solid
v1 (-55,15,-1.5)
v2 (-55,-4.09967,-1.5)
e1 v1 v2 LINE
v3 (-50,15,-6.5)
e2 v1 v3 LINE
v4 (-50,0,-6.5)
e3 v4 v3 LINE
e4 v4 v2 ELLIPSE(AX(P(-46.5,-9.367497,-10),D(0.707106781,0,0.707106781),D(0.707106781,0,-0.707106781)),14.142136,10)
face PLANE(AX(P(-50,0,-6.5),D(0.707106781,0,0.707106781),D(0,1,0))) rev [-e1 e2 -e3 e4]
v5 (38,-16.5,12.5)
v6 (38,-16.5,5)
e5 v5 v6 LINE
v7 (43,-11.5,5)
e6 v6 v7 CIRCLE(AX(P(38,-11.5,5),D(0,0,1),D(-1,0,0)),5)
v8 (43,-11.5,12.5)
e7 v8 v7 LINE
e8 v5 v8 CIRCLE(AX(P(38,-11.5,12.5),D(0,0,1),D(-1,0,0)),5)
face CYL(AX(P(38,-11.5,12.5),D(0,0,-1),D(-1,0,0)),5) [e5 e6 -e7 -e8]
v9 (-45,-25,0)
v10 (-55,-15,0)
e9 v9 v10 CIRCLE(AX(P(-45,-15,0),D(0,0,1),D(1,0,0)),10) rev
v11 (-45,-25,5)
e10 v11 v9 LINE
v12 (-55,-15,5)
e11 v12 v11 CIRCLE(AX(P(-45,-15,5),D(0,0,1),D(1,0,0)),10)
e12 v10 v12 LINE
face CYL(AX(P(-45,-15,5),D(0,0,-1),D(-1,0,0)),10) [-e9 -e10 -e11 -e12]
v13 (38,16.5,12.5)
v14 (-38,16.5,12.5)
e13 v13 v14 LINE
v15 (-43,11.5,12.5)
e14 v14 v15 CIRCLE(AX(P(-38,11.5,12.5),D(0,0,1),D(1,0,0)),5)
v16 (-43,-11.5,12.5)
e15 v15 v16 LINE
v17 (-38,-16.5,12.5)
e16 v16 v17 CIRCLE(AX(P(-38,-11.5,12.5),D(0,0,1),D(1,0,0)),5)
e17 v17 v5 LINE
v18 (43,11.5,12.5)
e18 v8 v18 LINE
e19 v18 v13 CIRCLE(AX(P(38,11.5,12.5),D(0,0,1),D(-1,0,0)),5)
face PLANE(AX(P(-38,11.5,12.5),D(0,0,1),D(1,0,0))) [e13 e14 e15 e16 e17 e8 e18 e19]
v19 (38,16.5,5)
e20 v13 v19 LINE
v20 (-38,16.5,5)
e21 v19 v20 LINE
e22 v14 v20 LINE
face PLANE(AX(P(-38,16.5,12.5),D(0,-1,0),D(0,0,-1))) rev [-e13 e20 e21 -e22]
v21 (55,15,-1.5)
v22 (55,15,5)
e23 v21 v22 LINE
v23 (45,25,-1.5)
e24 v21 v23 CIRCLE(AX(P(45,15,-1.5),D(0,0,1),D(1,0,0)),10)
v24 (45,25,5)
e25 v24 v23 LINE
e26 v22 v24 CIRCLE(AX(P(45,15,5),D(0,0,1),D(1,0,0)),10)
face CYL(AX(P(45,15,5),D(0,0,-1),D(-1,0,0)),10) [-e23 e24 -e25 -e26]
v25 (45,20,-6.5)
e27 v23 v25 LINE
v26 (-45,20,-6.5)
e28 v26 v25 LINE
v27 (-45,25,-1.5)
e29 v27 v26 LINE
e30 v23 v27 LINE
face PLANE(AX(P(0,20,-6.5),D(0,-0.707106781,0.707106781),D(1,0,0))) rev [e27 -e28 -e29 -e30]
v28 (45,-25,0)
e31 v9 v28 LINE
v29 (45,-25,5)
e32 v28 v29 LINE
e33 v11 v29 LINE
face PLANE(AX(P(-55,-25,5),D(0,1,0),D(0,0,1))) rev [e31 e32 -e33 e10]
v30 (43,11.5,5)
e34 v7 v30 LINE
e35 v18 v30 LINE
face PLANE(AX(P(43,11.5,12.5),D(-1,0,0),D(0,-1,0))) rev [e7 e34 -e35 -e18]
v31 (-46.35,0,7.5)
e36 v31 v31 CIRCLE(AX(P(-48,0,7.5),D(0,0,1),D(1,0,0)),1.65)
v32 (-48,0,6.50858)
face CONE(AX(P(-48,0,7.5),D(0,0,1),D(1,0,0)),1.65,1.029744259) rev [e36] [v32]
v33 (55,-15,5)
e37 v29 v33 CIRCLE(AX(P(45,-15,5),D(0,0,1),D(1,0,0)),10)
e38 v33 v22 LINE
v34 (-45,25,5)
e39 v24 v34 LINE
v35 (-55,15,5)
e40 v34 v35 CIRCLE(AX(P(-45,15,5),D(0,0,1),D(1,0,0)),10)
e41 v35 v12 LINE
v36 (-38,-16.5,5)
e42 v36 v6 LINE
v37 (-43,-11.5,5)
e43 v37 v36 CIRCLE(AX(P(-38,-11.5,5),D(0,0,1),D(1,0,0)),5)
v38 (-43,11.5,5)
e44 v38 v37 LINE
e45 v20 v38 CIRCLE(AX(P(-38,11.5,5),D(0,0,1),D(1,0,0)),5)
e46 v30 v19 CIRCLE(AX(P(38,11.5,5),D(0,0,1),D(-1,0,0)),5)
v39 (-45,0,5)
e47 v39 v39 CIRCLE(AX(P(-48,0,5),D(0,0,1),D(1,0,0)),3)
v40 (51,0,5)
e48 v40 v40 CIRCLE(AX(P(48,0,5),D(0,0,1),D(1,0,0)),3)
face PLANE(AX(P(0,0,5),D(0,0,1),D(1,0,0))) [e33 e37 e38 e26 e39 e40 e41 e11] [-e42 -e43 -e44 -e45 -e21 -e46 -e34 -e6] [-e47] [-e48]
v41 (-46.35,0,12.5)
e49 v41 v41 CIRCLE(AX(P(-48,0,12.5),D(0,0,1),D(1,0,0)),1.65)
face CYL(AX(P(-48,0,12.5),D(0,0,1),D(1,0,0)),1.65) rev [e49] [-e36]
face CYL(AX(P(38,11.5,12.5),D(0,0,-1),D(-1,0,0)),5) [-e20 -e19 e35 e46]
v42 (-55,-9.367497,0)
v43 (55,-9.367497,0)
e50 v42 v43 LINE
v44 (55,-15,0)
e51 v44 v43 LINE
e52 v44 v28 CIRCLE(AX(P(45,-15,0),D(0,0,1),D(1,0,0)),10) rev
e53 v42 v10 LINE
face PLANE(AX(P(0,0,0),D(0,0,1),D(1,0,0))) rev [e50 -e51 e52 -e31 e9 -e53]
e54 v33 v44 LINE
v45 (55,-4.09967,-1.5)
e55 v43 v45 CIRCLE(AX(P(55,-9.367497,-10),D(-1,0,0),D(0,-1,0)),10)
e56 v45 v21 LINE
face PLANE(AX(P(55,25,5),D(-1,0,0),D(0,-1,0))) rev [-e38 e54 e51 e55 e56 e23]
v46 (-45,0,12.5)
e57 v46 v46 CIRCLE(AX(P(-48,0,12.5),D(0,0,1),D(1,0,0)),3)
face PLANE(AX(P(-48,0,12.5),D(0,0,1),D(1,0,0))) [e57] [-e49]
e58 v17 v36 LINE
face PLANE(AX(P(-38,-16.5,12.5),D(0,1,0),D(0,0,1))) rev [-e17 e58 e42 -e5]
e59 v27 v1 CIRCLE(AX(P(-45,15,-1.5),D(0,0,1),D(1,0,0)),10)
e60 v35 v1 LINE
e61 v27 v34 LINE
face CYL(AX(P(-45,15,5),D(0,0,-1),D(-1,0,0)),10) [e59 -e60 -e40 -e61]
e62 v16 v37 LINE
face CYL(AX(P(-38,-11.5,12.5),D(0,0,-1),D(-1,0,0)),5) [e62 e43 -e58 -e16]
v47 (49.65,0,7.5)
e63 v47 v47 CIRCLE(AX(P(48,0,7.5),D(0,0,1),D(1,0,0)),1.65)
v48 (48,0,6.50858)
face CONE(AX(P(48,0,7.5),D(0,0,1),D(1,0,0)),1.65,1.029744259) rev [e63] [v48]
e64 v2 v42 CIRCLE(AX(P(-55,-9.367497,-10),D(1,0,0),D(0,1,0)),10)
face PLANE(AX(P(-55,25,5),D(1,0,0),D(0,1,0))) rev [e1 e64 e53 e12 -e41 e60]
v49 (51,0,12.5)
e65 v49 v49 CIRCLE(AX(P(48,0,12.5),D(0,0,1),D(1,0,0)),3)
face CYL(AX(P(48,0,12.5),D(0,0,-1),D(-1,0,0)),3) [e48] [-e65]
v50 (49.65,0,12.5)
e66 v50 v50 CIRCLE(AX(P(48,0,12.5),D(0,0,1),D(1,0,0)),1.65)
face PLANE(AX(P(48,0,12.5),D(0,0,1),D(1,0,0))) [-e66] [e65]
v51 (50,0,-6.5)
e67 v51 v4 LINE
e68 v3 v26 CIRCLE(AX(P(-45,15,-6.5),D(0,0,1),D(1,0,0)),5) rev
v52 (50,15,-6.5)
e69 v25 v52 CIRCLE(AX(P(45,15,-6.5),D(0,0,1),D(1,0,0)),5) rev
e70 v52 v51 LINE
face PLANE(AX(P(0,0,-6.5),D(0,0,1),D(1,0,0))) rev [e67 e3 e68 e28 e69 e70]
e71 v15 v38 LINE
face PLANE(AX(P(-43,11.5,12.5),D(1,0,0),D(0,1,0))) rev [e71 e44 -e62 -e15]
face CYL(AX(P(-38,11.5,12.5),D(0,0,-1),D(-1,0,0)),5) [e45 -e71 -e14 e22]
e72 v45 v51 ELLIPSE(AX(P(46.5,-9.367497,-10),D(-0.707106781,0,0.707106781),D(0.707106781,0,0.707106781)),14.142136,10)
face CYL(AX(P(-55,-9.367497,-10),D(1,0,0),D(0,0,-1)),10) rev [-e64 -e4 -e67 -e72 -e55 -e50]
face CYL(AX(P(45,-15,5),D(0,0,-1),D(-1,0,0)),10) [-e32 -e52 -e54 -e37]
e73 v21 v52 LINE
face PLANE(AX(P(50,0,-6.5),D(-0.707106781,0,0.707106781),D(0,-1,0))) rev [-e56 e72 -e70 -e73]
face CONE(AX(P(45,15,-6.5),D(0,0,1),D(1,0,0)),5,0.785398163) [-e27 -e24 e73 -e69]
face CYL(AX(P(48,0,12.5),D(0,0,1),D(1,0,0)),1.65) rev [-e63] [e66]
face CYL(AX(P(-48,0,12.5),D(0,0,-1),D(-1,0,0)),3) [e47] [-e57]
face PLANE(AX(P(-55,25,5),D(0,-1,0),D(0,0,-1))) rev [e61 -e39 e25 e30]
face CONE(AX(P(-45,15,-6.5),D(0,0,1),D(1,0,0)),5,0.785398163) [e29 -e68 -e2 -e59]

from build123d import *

# Parameters (mm, degrees)
SKETCH_1_W             = 110
SKETCH_1_H             = 50
EXTRUDE_1_DEPTH        = 5
SKETCH_2_R             = 3
EXTRUDE_2_DEPTH        = 7.5
HOLE_WIZARD_M4_1_D     = 3.3
HOLE_WIZARD_M4_1_DEPTH = 5
HOLE_WIZARD_M4_1_TIP   = 0.991420021
SKETCH_6_W             = 110
SKETCH_6_H             = 25
EXTRUDE_3_DEPTH        = 6.5
FILLET_1_R             = 10
CHAMFER_1_SIZE         = 5
FILLET_2_R             = 10


with BuildPart() as part:
    # 草图1 → 凸台-拉伸1 (new body)
    with BuildSketch(Plane.XY):
        Rectangle(SKETCH_1_W, SKETCH_1_H)
    extrude(amount=EXTRUDE_1_DEPTH)

    # 草图2 → 凸台-拉伸2 (add)
    with BuildSketch(Plane.XY.offset(5)):
        with Locations((-48, 0)):
            Circle(SKETCH_2_R)
        with Locations((48, 0)):
            Circle(SKETCH_2_R)
        with BuildLine():
            Line((-38, 16.5), (38, 16.5))
            ThreePointArc((38, 16.5), (41.535533906, 15.035533906), (43, 11.5))
            Line((43, 11.5), (43, -11.5))
            ThreePointArc((43, -11.5), (41.535533906, -15.035533906), (38, -16.5))
            Line((38, -16.5), (-38, -16.5))
            ThreePointArc((-38, -16.5), (-41.535533906, -15.035533906), (-43, -11.5))
            Line((-43, -11.5), (-43, 11.5))
            ThreePointArc((-43, 11.5), (-41.535533906, 15.035533906), (-38, 16.5))
        make_face()
    extrude(amount=EXTRUDE_2_DEPTH)

    # M4 螺纹孔1
    with Locations(Plane.XY.offset(12.5)):
        with Locations((48, 0), (-48, 0)):
            Hole(HOLE_WIZARD_M4_1_D / 2, depth=HOLE_WIZARD_M4_1_DEPTH)
            with Locations((0, 0, -(HOLE_WIZARD_M4_1_DEPTH + HOLE_WIZARD_M4_1_TIP / 2))):  # 118° drill point
                Cone(0, HOLE_WIZARD_M4_1_D / 2, HOLE_WIZARD_M4_1_TIP, mode=Mode.SUBTRACT)

    # 草图6 → 凸台-拉伸3 (add)
    with BuildSketch(Plane(origin=(0, 0, 0), x_dir=(-1, 0, 0), z_dir=(0, 0, -1))):
        with Locations((0, 12.5)):
            Rectangle(SKETCH_6_W, SKETCH_6_H)
    extrude(amount=EXTRUDE_3_DEPTH)

    # 圆角1
    fillet_1_edges = [part.edges().sort_by_distance(p)[0] for p in [
        (55, -25, 2.5),
        (-55, -25, 2.5),
        (-55, 25, -0.75),
        (55, 25, -0.75),
    ]]
    fillet(fillet_1_edges, radius=FILLET_1_R)

    # 倒角1
    chamfer_1_edges = [part.edges().sort_by_distance(p)[0] for p in [
        (-55, 7.5, -6.5),
        (0, 25, -6.5),
        (55, 7.5, -6.5),
        (-52.071067812, 22.071067812, -6.5),
        (52.071067812, 22.071067812, -6.5),
    ]]
    chamfer(chamfer_1_edges, length=CHAMFER_1_SIZE)

    # 圆角2
    # the kernel refuses this fillet: 10 mm, written as the material it adds along each edge
    with BuildSketch(Plane(origin=(55, 0, 0), x_dir=(0, 0, -1), z_dir=(-1, 0, 0))) as fillet_2_piece_1_section:
        with BuildLine():
            CenterArc((10, 9.367496998), FILLET_2_R, 180, 69.512684885)
            Line((0, 9.367496998), (-0.2, 9.367496998))
            Line((-0.2, 9.367496998), (-0.2, 0))
            Line((-0.2, 0), (0, -0.2))
            ThreePointArc((0, -0.2), (3.25, -0.2), (6.43, -0.18734994))
            Line((6.43, -0.18734994), (6.5, 0))
        make_face()
    fillet_2_piece_1 = extrude(amount=110, mode=Mode.PRIVATE)
    fillet_2_piece_1 = split(fillet_2_piece_1, bisect_by=Plane(origin=(-27.428646518, -2.275588703, -29.071353482), z_dir=(0.7071067811865476, 0, 0.7071067811865476)), keep=Keep.TOP, mode=Mode.PRIVATE)
    fillet_2_piece_1 = split(fillet_2_piece_1, bisect_by=Plane(origin=(27.428646518, -2.275588703, -29.071353482), z_dir=(-0.7071067811865476, 0, 0.7071067811865476)), keep=Keep.TOP, mode=Mode.PRIVATE)
    add(fillet_2_piece_1)


solid = part.part
